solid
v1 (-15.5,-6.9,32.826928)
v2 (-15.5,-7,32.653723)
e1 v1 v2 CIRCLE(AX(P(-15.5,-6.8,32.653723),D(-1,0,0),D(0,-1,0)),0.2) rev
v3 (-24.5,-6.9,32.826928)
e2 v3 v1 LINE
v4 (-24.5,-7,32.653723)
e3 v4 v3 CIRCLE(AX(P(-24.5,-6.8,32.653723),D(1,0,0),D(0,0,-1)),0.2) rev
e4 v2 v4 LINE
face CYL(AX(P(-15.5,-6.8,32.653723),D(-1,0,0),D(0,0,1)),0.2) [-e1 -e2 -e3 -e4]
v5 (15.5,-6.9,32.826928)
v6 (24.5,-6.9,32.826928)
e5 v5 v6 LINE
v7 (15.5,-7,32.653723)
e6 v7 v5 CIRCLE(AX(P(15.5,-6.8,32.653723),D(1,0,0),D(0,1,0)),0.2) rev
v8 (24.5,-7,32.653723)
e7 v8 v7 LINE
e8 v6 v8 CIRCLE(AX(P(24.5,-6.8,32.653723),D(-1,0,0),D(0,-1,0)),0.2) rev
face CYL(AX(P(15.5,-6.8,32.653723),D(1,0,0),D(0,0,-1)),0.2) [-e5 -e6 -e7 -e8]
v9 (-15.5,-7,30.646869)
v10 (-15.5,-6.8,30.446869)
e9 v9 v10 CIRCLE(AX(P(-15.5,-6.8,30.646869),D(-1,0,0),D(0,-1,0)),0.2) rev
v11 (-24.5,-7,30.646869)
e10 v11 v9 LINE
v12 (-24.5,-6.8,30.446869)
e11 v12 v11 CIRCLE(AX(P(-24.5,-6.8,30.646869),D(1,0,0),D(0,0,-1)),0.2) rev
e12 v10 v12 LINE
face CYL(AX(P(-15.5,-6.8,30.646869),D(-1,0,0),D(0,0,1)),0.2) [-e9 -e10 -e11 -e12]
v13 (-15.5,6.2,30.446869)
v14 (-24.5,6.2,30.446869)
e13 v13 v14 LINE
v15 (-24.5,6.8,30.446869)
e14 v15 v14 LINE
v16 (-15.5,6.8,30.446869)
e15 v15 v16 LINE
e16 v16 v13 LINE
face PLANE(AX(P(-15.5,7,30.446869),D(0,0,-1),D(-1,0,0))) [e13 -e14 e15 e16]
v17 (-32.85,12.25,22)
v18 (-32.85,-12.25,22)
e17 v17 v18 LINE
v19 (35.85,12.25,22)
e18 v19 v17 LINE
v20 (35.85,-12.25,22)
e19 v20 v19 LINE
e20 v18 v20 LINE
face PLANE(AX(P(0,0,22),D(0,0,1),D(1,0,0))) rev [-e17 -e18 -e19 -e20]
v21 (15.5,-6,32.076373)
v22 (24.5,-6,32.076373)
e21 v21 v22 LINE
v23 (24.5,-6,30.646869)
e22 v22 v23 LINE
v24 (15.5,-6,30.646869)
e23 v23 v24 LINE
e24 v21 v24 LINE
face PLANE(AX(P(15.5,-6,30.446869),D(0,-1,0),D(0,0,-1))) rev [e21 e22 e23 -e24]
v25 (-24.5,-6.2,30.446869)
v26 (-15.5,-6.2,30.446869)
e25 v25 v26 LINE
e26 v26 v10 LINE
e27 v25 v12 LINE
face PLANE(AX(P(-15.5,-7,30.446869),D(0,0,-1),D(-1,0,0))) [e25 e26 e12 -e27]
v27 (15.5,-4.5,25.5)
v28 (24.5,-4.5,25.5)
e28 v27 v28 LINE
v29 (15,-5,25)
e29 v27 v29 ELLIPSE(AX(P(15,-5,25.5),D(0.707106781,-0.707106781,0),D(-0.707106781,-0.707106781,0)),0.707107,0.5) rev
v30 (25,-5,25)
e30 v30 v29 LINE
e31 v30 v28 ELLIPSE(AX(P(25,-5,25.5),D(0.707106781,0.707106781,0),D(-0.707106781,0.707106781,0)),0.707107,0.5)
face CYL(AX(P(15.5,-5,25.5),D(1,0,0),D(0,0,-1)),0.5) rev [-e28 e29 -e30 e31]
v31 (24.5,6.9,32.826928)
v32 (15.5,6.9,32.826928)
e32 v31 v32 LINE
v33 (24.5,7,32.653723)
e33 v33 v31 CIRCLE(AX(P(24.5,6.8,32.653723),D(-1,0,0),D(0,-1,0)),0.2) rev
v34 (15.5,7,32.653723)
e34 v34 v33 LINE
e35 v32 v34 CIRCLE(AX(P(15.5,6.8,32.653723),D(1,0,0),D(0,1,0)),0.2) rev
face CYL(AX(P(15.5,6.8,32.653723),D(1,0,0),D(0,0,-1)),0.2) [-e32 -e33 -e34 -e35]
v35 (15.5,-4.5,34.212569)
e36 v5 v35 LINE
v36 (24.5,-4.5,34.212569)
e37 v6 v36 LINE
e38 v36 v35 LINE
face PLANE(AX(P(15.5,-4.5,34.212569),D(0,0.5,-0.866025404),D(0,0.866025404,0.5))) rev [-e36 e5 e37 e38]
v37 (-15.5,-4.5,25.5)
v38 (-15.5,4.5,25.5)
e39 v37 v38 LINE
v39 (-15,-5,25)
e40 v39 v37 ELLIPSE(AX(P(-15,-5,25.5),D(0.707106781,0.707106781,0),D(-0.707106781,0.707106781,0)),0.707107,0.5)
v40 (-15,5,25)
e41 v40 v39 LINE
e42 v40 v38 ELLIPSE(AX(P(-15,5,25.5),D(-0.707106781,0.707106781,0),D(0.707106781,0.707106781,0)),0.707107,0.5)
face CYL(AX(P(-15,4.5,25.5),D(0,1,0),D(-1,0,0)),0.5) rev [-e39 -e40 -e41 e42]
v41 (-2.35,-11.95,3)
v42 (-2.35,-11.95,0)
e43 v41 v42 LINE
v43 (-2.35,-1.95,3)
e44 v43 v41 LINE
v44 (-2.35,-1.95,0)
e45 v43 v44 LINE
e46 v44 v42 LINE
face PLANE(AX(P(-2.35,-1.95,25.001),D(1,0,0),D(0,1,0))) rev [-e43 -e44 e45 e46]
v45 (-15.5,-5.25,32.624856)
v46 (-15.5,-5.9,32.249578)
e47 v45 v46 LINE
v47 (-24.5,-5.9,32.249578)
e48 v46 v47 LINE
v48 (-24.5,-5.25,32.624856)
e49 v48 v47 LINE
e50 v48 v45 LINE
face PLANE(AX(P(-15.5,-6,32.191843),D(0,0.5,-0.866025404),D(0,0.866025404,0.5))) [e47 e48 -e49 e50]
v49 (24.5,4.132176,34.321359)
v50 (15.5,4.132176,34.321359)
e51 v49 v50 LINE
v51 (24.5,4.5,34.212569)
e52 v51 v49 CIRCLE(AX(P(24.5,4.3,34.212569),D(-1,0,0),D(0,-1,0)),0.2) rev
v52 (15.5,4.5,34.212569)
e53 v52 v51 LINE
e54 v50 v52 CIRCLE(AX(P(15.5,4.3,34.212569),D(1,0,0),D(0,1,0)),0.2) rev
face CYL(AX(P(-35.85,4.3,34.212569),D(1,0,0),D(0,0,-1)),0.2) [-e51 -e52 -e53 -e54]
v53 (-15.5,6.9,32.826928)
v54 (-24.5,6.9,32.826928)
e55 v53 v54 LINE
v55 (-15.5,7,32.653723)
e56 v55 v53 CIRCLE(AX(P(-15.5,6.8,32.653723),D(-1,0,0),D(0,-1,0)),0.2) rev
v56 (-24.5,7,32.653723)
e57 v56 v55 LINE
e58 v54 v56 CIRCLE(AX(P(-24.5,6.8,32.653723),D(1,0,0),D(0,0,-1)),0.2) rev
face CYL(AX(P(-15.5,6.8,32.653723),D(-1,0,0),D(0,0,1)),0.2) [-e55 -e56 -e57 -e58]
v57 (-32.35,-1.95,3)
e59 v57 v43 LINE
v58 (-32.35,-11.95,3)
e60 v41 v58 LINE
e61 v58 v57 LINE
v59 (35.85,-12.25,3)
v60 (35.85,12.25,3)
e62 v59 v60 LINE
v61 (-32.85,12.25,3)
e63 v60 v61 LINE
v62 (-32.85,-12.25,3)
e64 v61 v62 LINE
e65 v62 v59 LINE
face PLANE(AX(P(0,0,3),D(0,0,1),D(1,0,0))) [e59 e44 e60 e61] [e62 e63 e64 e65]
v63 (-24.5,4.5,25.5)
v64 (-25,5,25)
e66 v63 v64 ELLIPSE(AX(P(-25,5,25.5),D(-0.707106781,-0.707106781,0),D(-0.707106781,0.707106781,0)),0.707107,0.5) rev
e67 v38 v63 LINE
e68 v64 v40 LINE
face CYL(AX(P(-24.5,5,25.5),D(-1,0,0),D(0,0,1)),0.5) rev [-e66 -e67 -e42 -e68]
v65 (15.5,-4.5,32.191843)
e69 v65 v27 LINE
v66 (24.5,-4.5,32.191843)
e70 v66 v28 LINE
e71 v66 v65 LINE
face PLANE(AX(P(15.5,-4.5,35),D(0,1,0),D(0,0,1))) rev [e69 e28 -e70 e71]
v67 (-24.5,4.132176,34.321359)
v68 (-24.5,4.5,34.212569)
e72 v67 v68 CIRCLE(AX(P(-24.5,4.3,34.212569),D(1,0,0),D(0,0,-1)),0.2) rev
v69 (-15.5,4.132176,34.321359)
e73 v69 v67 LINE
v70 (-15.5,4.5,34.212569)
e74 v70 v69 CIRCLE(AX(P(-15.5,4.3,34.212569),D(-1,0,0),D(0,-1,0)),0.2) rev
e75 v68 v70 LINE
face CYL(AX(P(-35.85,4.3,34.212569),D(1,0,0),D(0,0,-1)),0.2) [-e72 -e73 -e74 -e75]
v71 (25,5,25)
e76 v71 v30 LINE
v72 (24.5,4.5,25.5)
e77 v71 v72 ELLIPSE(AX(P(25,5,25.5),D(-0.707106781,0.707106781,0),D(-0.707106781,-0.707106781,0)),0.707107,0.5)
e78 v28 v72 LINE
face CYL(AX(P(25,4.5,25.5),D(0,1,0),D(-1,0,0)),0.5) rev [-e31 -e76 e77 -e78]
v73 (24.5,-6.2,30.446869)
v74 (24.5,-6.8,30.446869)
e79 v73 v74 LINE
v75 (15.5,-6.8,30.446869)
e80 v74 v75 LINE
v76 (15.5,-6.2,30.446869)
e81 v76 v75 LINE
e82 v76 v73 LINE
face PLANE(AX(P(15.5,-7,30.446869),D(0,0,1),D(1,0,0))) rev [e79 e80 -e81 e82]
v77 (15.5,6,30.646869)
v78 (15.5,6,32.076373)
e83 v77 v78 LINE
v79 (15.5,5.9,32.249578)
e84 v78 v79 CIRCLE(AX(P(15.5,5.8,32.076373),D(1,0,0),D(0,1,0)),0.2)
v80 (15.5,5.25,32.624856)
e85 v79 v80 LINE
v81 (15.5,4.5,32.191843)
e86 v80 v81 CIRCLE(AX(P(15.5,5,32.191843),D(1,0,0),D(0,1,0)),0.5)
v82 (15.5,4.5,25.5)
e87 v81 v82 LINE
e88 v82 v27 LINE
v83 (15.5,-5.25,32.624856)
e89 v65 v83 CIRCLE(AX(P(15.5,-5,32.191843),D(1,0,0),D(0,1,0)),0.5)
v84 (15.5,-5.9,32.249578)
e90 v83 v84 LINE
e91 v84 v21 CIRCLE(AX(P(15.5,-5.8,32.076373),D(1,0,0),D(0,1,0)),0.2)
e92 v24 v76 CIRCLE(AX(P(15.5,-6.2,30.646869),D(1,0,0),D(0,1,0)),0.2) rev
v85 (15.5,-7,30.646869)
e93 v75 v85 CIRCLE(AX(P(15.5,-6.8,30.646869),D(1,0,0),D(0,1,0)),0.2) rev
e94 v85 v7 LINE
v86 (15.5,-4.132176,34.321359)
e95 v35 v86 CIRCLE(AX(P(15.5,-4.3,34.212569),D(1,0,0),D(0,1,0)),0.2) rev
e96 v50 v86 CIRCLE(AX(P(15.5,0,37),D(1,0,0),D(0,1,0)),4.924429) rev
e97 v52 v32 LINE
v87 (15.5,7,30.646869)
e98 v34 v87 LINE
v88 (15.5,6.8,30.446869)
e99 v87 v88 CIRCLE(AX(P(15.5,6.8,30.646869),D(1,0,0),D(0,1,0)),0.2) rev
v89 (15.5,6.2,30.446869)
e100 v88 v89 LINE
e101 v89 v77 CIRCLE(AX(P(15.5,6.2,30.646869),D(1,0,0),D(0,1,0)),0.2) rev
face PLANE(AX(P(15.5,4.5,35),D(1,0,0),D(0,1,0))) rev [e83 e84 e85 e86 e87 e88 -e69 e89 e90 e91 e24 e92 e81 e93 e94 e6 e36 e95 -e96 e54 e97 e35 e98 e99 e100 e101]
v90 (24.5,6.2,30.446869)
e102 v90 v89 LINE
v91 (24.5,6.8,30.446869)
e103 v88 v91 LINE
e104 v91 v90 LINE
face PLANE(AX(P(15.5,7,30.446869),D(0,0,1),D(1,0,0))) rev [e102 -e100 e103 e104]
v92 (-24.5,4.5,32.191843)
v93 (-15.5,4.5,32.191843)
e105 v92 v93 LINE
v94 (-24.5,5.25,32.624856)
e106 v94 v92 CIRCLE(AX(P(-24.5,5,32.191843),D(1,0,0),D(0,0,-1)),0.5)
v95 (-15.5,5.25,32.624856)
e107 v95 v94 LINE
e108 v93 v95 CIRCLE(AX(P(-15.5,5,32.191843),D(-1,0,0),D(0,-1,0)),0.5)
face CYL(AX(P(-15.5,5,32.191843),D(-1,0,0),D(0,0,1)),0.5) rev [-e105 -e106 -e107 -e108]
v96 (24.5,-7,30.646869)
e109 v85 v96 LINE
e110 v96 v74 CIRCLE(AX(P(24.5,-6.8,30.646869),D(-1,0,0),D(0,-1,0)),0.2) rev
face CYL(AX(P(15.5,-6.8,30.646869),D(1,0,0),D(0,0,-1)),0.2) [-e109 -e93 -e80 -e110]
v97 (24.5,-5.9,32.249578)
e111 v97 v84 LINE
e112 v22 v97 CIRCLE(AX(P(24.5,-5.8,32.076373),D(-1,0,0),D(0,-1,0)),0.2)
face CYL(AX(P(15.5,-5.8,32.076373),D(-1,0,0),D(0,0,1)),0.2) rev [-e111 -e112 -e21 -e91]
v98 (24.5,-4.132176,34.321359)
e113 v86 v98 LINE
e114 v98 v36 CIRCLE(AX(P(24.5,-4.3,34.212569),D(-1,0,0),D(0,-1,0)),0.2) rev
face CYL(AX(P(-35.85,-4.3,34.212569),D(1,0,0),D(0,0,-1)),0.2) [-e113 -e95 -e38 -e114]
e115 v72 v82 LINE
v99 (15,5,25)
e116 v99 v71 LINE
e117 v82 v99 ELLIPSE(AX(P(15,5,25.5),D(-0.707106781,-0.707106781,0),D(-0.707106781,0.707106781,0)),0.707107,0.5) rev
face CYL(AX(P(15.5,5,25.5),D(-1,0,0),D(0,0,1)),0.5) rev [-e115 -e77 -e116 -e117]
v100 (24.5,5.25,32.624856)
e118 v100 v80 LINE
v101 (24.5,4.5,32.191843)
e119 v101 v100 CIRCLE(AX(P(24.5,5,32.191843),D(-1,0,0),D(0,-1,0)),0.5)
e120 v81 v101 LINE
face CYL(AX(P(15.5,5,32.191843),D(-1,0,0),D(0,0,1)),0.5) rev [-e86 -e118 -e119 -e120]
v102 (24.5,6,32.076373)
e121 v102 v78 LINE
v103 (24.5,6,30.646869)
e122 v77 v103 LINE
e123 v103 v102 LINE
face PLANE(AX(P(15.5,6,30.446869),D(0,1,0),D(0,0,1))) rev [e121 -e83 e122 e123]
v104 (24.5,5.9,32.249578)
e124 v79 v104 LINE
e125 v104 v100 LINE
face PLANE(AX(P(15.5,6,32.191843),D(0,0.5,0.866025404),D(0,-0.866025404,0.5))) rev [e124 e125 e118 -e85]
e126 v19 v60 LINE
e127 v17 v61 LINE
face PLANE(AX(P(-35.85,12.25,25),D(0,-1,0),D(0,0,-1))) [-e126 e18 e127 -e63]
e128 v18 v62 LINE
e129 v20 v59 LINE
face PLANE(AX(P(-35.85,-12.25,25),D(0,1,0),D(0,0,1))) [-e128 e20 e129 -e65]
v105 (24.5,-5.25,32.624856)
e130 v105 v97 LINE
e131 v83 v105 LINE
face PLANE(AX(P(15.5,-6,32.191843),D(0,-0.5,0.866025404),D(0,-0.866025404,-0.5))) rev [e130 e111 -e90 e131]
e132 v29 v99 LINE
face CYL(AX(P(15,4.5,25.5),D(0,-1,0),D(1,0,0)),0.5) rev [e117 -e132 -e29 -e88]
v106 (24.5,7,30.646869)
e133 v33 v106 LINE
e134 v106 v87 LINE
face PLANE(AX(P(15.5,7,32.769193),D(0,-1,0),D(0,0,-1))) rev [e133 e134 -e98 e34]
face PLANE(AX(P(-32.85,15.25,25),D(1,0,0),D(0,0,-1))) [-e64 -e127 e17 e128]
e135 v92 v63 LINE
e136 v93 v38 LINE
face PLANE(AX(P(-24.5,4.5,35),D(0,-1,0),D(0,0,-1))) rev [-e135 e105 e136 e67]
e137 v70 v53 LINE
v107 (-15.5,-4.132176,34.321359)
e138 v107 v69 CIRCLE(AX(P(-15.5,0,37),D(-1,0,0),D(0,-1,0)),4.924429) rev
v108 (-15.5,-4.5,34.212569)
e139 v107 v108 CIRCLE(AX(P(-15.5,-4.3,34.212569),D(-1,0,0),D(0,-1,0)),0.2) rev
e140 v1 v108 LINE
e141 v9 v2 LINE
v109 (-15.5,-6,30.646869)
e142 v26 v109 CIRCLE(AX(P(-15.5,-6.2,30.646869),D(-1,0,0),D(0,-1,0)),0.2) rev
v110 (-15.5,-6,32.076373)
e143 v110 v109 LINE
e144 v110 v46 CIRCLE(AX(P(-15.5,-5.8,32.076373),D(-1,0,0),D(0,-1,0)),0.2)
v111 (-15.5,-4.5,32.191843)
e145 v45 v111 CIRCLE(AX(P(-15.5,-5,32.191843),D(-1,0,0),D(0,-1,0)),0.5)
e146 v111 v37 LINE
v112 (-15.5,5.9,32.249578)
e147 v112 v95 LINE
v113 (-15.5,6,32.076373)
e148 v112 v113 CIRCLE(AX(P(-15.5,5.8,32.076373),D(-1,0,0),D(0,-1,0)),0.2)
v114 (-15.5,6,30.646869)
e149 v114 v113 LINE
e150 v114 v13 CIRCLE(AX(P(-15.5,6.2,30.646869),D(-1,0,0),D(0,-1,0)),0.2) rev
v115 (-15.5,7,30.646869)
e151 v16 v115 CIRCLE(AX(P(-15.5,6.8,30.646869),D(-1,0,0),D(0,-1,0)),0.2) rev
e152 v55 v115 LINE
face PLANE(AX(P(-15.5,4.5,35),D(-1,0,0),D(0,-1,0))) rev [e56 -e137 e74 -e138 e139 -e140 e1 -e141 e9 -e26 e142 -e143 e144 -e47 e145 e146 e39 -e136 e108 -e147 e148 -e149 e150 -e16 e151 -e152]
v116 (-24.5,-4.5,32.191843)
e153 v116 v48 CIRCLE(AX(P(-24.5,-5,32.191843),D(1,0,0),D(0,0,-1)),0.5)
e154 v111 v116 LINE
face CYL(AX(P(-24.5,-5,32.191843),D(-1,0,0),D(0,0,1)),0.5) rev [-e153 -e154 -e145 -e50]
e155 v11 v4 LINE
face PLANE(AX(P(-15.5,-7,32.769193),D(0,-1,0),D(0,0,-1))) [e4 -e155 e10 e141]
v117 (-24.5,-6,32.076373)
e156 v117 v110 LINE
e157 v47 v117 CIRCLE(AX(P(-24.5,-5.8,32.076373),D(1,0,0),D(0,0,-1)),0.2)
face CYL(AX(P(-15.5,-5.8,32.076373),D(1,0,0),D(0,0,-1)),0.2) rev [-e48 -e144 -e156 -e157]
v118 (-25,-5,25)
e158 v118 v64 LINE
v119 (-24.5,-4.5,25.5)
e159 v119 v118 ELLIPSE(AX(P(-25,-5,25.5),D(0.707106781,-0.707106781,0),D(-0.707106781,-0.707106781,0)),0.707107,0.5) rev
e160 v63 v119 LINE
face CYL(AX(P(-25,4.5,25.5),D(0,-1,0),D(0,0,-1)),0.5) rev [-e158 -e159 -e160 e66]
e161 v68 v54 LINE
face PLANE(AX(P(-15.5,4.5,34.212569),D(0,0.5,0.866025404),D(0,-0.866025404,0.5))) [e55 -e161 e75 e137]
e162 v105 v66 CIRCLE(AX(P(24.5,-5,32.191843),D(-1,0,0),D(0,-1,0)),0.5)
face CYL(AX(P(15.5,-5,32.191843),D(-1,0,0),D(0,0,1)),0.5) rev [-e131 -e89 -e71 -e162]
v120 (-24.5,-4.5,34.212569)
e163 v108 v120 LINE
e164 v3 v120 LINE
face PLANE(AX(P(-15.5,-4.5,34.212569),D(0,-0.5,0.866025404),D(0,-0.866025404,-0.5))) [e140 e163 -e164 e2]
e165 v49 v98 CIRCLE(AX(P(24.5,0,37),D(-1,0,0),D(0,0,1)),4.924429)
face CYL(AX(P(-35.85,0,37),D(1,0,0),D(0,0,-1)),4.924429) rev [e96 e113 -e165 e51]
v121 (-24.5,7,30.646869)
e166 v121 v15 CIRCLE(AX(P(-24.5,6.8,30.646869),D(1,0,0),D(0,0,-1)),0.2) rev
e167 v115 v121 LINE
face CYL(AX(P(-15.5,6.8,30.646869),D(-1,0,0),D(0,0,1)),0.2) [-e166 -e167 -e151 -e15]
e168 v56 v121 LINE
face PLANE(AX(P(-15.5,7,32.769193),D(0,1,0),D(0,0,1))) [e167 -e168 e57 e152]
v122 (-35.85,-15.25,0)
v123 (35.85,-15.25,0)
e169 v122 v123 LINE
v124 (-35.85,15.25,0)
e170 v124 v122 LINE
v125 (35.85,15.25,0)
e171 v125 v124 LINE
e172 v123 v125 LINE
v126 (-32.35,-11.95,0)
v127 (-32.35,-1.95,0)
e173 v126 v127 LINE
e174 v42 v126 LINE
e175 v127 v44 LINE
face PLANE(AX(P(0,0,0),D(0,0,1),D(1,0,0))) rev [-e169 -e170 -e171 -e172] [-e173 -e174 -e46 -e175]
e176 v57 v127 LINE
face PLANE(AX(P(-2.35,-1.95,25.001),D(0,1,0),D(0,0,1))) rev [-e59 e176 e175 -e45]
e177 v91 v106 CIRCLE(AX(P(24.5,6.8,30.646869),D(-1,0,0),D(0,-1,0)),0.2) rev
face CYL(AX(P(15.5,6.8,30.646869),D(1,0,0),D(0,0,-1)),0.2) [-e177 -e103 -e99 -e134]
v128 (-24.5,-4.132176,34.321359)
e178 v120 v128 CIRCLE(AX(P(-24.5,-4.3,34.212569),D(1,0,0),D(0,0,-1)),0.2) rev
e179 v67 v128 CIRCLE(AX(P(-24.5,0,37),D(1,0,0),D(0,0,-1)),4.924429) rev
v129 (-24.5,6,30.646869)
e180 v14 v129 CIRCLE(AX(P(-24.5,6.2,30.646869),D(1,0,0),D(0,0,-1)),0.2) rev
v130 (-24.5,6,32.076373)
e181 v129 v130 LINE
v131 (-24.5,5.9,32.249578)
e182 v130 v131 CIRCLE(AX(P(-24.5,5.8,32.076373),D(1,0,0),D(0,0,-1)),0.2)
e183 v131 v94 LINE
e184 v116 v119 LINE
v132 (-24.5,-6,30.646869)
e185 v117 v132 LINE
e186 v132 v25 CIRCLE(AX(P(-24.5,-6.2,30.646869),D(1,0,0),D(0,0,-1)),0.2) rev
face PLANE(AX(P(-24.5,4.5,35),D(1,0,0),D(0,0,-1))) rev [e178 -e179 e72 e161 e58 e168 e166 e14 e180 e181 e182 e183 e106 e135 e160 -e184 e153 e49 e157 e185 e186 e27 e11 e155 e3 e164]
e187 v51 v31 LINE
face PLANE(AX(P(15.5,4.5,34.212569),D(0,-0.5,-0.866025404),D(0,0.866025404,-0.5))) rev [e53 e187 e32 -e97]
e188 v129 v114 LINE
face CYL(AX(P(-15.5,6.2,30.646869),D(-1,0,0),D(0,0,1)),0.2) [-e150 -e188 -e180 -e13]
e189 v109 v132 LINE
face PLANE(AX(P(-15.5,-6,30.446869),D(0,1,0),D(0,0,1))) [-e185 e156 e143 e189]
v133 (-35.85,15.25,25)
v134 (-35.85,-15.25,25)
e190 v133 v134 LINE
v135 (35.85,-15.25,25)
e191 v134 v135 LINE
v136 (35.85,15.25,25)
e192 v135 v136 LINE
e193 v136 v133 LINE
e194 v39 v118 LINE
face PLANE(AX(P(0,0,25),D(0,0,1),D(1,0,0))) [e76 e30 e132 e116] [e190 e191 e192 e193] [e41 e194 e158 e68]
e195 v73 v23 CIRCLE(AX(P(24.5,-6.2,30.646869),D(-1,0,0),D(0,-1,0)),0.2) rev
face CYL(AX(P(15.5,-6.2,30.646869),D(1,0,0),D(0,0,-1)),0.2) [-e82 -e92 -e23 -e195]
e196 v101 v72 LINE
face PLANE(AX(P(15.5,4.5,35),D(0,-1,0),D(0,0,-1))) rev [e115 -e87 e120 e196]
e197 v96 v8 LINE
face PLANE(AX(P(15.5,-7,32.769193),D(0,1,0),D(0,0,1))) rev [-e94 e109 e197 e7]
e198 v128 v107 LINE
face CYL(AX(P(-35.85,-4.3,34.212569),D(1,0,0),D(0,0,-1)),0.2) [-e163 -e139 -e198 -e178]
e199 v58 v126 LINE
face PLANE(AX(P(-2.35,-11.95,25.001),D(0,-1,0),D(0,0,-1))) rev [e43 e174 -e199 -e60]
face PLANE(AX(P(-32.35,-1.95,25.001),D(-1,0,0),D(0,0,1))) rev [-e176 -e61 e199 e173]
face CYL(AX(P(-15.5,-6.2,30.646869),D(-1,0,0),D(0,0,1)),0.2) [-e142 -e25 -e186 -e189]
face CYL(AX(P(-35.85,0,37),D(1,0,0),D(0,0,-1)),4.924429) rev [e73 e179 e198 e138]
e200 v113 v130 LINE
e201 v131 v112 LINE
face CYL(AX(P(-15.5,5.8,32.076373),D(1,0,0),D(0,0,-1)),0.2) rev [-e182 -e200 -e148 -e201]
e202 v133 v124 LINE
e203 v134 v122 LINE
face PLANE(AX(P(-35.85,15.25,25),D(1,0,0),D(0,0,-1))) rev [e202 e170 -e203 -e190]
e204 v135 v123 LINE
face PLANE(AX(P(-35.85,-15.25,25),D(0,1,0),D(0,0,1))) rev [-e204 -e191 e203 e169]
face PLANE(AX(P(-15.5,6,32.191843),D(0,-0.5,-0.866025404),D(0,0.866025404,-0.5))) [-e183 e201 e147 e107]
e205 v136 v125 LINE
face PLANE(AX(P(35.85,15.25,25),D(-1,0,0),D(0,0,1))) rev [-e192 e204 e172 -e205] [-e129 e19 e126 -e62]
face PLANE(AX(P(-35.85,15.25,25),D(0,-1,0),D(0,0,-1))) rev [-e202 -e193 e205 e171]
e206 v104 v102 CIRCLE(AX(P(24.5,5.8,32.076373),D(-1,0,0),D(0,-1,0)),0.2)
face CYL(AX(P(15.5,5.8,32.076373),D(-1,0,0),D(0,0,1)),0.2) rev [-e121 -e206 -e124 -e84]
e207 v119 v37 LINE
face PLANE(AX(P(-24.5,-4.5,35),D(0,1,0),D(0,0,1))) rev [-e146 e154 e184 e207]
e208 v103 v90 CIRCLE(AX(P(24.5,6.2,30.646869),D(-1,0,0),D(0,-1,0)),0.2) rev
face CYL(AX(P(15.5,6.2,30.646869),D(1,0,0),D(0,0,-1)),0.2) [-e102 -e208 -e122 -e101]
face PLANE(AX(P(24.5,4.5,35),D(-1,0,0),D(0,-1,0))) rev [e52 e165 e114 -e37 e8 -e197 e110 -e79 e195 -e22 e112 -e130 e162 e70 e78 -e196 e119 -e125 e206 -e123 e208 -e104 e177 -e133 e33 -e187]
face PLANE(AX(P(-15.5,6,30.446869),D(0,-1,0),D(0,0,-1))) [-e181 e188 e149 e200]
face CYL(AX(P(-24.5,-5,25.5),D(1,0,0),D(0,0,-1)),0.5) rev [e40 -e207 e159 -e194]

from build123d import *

# Parameters (mm, degrees)
SKETCH_1_W          = 71.7
SKETCH_1_H          = 30.5
EXTRUDE_1_DEPTH     = 25
SHELL_1_T           = -3
CUT_EXTRUDE_1_REACH = 48.29
SKETCH_2_W          = 30
SKETCH_2_H          = 10
SKETCH_3_W          = 9
SKETCH_3_H          = 9
EXTRUDE_2_DEPTH     = 10
SKETCH_4_R          = 4.924428901
CUT_EXTRUDE_2_DEPTH = 72.41207881
FILLET_1_R          = 0.2
EXTRUDE_3_DEPTH     = 9
FILLET_2_R          = 0.2
FILLET_3_R          = 0.5
MIRROR_START        = 15.5
MIRROR_2_DEPTH      = 9
FILLET_5_R          = 0.5
FILLET_6_R          = 0.5


# Read off the part's stored shape, not the designer's step: 镜向2
with BuildPart() as part:
    # 草图1 → 凸台-拉伸1 (new body)
    with BuildSketch(Plane.XY):
        Rectangle(SKETCH_1_W, SKETCH_1_H)
    extrude(amount=EXTRUDE_1_DEPTH)

    # 抽壳1
    shell_1_openings = [part.faces().sort_by_distance(p)[0] for p in [
        (35.85, 0, 12.5),
    ]]
    offset(amount=SHELL_1_T, openings=shell_1_openings, kind=Kind.INTERSECTION)

    # 草图2 → 切除-拉伸1 (cut, up to next)
    with BuildSketch(Plane(origin=(0, 0, 0), x_dir=(-1, 0, 0), z_dir=(0, 0, -1)), mode=Mode.PRIVATE) as cut_extrude_1_sk1:
        with Locations((17.35, -6.95)):
            Rectangle(SKETCH_2_W, SKETCH_2_H)
    cut_extrude_1_tool1 = extrude(cut_extrude_1_sk1.sketch, amount=-CUT_EXTRUDE_1_REACH, mode=Mode.PRIVATE) & part.part
    add(cut_extrude_1_tool1.solids().sort_by_distance((-17.35, -6.95, 0))[0], mode=Mode.SUBTRACT)

    # 草图3 → 凸台-拉伸2 (add)
    with BuildSketch(Plane.XY.offset(25)):
        with Locations((-20, 0)):
            Rectangle(SKETCH_3_W, SKETCH_3_H)
        with Locations((20, 0)):
            Rectangle(SKETCH_3_W, SKETCH_3_H)
    extrude(amount=EXTRUDE_2_DEPTH)

    # 草图4 → 切除-拉伸2 (cut, through all)
    with BuildSketch(Plane.ZY.offset(24.5)):
        with Locations((37, 0)):
            Circle(SKETCH_4_R)
    extrude(amount=-CUT_EXTRUDE_2_DEPTH, mode=Mode.SUBTRACT)

    # 圆角1
    fillet_1_edges = [part.edges().sort_by_distance(p)[0] for p in [
        (-20, 4.5, 35),
        (-20, -4.5, 35),
        (20, 4.5, 35),
        (20, -4.5, 35),
    ]]
    fillet(fillet_1_edges, radius=FILLET_1_R)

    # 草图5 → 凸台-拉伸3 (add)
    with BuildSketch(Plane.ZY.offset(24.5)):
        Polygon((34.212569003, 4.5), (32.769193331, 7), (30.446869021, 7), (30.446869021, 6), (32.191843061, 6), (33.057868465, 4.5), align=None)
        Polygon((32.769193331, -7), (30.446869021, -7), (30.446869021, -6), (32.191843061, -6), (33.057868465, -4.5), (34.212569003, -4.5), align=None)
    extrude(amount=-EXTRUDE_3_DEPTH)

    # 圆角2
    fillet_2_edges = [part.edges().sort_by_distance(p)[0] for p in [
        (-20, 6, 32.191843061),
        (-20, 6, 30.446869021),
        (-20, 7, 30.446869021),
        (-20, 7, 32.769193331),
        (-20, -7, 32.769193331),
        (-20, -7, 30.446869021),
        (-20, -6, 30.446869021),
        (-20, -6, 32.191843061),
    ]]
    fillet(fillet_2_edges, radius=FILLET_2_R)

    # 圆角3
    fillet_3_edges = [part.edges().sort_by_distance(p)[0] for p in [
        (-20, 4.5, 33.057868465),
        (-20, -4.5, 33.057868465),
    ]]
    fillet(fillet_3_edges, radius=FILLET_3_R)

    # 镜向2 outline → 镜向2 (add)
    with BuildSketch(Plane.YZ.offset(MIRROR_START)):
        with BuildLine():
            Line((5.25, 32.624855763), (5.9, 32.249578088))
            ThreePointArc((5.9, 32.249578088), (5.973205081, 32.176373007), (6, 32.076373007))
            Line((6, 32.076373007), (6, 30.646869021))
            ThreePointArc((6, 30.646869021), (6.058578644, 30.505447665), (6.2, 30.446869021))
            Line((6.2, 30.446869021), (6.8, 30.446869021))
            ThreePointArc((6.8, 30.446869021), (6.941421356, 30.505447665), (7, 30.646869021))
            Line((7, 30.646869021), (7, 32.653723277))
            ThreePointArc((7, 32.653723277), (6.973205081, 32.753723277), (6.9, 32.826928357))
            Line((6.9, 32.826928357), (4.5, 34.212569003))
            Line((4.5, 34.212569003), (4.5, 32.191843061))
            ThreePointArc((4.5, 32.191843061), (4.75, 32.624855763), (5.25, 32.624855763))
        make_face()
        with BuildLine():
            Line((-6.8, 30.446869021), (-6.2, 30.446869021))
            ThreePointArc((-6.2, 30.446869021), (-6.058578644, 30.505447665), (-6, 30.646869021))
            Line((-6, 30.646869021), (-6, 32.076373007))
            ThreePointArc((-6, 32.076373007), (-5.973205081, 32.176373007), (-5.9, 32.249578088))
            Line((-5.9, 32.249578088), (-5.25, 32.624855763))
            ThreePointArc((-5.25, 32.624855763), (-4.75, 32.624855763), (-4.5, 32.191843061))
            Line((-4.5, 32.191843061), (-4.5, 34.212569003))
            Line((-4.5, 34.212569003), (-6.9, 32.826928357))
            ThreePointArc((-6.9, 32.826928357), (-6.973205081, 32.753723277), (-7, 32.653723277))
            Line((-7, 32.653723277), (-7, 30.646869021))
            ThreePointArc((-7, 30.646869021), (-6.941421356, 30.505447665), (-6.8, 30.446869021))
        make_face()
    extrude(amount=MIRROR_2_DEPTH)

    # 圆角5
    fillet_5_edges = [part.edges().sort_by_distance(p)[0] for p in [
        (-15.5, 0, 25),
        (-20, 4.5, 25),
        (-24.5, 0, 25),
        (-20, -4.5, 25),
    ]]
    fillet(fillet_5_edges, radius=FILLET_5_R)

    # 圆角6
    fillet_6_edges = [part.edges().sort_by_distance(p)[0] for p in [
        (24.5, 0, 25),
        (20, 4.5, 25),
        (15.5, 0, 25),
        (20, -4.5, 25),
    ]]
    fillet(fillet_6_edges, radius=FILLET_6_R)


solid = part.part
